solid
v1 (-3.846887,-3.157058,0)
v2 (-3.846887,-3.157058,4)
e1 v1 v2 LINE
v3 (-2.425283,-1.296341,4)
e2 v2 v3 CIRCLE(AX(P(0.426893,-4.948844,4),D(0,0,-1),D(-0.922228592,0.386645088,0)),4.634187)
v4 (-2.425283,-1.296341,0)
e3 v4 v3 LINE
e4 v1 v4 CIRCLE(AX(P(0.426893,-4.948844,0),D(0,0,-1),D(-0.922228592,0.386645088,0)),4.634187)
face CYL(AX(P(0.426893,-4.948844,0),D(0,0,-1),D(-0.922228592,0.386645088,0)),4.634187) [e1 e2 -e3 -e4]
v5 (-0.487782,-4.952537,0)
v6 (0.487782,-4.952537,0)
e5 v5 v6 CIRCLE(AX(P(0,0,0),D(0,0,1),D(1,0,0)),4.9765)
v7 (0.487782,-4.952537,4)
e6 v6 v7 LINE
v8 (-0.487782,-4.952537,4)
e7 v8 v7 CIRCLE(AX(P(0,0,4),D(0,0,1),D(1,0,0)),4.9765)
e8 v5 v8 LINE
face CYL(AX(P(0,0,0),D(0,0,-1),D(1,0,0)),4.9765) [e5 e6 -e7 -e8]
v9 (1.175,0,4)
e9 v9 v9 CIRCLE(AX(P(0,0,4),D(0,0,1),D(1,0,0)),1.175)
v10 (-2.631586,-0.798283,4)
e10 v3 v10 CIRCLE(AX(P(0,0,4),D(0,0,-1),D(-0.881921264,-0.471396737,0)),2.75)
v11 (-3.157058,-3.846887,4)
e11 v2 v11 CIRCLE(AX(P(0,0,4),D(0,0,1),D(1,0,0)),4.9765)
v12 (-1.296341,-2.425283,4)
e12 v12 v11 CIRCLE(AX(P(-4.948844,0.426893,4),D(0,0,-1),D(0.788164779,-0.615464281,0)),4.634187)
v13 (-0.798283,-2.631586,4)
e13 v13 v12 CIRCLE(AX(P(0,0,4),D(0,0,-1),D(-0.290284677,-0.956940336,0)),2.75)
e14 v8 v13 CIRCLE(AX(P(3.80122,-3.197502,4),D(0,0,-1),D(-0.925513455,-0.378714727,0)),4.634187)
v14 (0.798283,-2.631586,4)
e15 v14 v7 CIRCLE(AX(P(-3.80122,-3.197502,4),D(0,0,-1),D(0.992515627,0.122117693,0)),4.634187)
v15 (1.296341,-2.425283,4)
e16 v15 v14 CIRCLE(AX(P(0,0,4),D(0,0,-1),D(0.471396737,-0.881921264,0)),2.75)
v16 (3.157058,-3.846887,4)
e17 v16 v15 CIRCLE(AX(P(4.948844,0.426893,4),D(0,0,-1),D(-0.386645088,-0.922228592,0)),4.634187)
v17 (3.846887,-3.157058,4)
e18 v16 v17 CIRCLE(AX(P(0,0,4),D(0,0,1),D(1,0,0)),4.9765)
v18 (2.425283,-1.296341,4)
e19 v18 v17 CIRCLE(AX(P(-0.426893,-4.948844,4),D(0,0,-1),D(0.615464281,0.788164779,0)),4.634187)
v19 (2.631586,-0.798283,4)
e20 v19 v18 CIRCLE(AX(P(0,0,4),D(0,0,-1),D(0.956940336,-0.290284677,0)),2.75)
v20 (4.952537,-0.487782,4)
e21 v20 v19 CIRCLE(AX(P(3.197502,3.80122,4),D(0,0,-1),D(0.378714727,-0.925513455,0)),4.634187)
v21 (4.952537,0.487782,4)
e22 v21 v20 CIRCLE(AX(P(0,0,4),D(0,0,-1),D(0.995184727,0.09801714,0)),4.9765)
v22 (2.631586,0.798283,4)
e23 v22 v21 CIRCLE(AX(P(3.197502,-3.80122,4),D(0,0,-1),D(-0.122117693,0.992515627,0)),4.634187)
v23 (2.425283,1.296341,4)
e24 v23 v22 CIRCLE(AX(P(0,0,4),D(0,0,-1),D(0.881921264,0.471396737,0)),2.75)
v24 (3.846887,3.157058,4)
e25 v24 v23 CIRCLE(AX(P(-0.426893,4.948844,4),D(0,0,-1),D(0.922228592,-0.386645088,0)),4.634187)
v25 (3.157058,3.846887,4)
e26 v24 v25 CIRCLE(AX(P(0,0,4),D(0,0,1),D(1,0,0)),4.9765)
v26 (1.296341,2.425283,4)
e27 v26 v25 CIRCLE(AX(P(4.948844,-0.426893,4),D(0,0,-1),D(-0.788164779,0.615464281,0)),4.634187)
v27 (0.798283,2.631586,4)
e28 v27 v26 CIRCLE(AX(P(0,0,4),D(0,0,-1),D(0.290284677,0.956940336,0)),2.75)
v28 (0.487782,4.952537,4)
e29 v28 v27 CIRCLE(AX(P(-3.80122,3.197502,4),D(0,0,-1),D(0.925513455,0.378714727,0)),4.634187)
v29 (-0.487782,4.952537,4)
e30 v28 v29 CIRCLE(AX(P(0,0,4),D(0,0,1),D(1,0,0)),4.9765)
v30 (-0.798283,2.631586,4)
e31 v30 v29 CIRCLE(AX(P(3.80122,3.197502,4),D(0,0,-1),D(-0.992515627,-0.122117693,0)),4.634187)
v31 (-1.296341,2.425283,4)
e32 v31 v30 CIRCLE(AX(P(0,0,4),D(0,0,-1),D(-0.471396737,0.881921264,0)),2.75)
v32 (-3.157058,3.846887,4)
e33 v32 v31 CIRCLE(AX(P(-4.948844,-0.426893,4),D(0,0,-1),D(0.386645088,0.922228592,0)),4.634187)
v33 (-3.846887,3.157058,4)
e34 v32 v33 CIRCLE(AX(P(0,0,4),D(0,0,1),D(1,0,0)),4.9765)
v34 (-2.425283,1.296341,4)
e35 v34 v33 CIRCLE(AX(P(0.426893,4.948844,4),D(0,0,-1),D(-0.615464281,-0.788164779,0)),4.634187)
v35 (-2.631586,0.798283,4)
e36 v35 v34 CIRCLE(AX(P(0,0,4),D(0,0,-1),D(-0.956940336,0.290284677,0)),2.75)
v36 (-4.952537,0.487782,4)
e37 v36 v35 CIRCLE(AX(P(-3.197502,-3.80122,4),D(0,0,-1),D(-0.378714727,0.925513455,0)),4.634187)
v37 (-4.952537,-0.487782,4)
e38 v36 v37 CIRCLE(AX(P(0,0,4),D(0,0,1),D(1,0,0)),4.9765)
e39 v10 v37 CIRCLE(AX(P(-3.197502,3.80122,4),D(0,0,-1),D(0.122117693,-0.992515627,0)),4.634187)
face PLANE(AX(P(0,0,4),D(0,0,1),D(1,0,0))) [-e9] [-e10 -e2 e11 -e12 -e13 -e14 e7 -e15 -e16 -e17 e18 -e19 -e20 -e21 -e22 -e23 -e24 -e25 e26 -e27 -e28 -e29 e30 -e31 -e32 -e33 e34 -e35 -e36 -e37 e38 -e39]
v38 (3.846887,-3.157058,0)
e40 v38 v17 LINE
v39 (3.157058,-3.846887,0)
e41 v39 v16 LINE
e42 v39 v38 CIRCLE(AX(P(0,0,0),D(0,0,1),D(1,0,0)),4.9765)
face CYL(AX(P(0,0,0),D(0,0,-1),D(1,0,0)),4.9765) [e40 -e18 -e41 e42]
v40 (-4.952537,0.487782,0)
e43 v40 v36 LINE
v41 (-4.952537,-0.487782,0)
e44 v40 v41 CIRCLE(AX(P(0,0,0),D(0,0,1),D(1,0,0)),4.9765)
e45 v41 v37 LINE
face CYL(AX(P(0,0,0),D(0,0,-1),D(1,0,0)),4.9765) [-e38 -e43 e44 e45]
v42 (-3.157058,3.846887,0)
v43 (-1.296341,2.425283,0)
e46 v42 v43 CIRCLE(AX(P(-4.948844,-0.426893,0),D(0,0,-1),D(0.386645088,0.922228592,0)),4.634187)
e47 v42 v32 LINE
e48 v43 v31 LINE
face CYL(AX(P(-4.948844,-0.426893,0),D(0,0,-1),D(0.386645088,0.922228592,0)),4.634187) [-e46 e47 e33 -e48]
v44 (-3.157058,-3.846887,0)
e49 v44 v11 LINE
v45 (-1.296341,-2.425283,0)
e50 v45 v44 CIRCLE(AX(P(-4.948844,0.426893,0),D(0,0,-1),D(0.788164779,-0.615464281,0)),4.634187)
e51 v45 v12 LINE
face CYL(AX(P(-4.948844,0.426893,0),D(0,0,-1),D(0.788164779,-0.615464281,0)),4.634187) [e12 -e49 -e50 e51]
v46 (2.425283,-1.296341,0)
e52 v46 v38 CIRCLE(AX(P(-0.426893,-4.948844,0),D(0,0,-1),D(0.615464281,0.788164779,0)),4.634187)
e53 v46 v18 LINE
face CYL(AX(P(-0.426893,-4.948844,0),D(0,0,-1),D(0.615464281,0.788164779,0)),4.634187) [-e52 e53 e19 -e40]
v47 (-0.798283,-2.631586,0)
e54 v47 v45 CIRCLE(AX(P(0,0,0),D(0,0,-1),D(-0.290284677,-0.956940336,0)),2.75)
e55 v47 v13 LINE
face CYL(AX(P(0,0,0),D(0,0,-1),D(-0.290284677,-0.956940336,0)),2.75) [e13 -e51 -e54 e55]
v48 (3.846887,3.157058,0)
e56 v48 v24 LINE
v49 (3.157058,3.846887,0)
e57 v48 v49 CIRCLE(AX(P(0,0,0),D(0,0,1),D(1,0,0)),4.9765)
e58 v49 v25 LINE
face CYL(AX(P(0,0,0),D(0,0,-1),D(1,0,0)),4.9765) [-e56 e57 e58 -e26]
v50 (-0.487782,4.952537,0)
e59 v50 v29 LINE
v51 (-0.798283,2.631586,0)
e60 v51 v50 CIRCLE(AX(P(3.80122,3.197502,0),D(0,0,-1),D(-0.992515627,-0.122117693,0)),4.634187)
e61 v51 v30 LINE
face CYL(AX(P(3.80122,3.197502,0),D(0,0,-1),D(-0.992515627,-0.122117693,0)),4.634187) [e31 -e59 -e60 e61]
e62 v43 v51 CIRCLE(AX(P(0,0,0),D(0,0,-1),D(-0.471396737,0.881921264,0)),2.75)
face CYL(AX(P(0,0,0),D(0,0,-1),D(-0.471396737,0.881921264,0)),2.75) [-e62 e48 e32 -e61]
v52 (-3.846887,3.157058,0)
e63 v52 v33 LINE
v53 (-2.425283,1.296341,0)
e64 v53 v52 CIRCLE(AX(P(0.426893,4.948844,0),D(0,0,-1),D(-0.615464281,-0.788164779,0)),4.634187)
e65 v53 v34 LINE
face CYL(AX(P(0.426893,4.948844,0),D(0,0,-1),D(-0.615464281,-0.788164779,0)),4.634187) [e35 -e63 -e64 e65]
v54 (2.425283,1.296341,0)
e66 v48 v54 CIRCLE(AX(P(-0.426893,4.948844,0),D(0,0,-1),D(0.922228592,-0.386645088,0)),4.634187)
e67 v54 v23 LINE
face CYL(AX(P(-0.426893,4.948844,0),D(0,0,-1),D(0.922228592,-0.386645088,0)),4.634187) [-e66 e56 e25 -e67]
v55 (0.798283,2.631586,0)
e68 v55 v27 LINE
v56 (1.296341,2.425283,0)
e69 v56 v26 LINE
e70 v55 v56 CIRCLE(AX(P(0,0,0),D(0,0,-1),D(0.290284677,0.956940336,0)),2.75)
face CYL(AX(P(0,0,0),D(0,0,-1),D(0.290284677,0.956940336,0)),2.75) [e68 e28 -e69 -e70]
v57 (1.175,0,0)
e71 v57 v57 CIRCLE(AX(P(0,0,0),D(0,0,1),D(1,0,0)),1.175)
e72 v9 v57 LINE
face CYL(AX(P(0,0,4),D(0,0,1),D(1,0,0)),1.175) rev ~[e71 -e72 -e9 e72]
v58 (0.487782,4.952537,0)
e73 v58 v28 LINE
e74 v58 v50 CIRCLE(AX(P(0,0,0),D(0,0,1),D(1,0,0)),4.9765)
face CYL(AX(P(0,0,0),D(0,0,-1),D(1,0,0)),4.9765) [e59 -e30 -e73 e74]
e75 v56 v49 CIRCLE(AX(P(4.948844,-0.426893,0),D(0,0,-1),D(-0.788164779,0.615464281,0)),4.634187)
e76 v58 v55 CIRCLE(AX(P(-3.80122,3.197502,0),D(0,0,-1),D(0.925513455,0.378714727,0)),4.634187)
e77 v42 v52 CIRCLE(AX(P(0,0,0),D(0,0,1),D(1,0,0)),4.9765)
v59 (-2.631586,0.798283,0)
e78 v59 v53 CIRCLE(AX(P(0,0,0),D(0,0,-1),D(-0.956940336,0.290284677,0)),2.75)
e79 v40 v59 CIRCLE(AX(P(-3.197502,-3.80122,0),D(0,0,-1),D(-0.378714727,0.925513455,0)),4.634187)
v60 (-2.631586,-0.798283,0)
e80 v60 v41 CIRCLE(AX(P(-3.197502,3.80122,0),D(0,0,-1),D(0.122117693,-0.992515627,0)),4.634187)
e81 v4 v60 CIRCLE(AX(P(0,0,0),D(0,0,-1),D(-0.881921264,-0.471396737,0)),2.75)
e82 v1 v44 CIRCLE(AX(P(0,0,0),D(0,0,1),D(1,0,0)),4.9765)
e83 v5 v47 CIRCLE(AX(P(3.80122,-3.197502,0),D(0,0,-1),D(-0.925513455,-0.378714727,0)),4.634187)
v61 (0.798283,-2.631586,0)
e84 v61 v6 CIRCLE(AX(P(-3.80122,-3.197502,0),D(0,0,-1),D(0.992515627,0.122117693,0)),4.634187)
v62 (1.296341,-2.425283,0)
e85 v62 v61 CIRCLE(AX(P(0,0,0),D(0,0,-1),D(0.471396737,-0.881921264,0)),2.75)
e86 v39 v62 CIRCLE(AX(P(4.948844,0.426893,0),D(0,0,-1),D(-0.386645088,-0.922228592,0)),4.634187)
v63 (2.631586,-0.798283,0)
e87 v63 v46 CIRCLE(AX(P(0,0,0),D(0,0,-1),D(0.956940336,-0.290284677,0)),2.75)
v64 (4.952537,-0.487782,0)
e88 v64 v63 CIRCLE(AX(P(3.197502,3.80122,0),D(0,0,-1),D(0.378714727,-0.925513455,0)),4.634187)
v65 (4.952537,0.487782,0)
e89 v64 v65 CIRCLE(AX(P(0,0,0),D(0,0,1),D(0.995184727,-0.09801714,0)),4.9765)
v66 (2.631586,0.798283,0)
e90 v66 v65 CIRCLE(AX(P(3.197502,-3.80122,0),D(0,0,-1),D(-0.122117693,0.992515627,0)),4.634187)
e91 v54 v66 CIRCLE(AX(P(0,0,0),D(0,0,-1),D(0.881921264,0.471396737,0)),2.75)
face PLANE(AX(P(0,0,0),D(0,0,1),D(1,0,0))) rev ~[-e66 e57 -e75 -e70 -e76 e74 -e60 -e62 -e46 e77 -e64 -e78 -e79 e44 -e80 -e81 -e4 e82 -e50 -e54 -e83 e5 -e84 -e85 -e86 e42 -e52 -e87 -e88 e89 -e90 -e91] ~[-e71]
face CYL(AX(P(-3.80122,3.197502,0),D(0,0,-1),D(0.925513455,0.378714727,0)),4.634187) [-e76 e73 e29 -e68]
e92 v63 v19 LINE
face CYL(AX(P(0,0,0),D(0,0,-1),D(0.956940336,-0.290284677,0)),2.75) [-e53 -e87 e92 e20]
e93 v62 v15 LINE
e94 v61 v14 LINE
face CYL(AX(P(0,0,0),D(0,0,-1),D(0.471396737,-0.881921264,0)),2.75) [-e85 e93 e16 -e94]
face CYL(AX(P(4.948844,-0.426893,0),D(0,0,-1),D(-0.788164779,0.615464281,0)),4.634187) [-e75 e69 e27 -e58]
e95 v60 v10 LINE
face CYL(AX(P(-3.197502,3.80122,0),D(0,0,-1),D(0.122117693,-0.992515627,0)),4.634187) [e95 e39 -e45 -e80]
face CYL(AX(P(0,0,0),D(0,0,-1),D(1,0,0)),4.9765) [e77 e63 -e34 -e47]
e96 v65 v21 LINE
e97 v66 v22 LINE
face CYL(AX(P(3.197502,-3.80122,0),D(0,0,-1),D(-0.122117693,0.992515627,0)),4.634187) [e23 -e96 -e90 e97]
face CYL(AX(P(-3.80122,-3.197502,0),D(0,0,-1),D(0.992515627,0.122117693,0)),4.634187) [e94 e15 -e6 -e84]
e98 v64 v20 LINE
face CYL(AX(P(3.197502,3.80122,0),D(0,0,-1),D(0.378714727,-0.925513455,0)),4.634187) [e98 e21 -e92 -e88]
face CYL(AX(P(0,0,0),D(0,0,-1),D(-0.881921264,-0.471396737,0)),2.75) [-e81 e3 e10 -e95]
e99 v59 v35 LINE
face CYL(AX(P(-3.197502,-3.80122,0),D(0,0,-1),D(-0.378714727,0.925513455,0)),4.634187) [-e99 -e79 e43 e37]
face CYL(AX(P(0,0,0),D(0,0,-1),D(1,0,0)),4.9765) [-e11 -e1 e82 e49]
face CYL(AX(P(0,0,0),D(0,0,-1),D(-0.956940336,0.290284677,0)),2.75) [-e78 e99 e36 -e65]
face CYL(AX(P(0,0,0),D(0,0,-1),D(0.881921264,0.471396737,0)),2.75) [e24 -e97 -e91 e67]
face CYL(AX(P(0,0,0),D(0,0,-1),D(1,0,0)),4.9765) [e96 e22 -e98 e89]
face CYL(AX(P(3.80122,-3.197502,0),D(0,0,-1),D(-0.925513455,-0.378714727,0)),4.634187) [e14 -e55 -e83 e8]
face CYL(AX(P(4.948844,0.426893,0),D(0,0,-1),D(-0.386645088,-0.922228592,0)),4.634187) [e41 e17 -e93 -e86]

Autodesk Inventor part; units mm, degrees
sketch "Sketch1" plane through (0, 0, 0) normal (0, 0, 1) x (1, 0, 0)
  circle A0 centre (0, 0) radius 4.9765
  dimension "d0" = 9.953
extrude "Extrusion1" add sketch "Sketch1" along normal blind 4
ref_plane "Work Plane2" through (0, 0, 2) normal (0, 0, 1) x (1, 0, 0)
sketch "Sketch2" plane through (0, 0, 0) normal (0, 0, -1) x (-1, 0, 0)
  circle A0 centre (0, 0) radius 4.9765 projected
  circle A1 centre (0, 0) radius 4
  dimension "d3" = 8
surface extrude "節圓直徑" sketch "Sketch2" against normal through all shown no curves A1
ref_plane "Work Plane8" through (0, 0, 0) normal (0.9238795, 0.3826834, 0) x (0, 0, 1)
ref_plane "Work Plane9" through (0, 0, 0) normal (1, 0, 0) x (0, 1, 0)
spur gear teeth "正齒輪" teeth 8 pitch diameter 8 tip diameter 9.953 root diameter 5.5 face width 4 start plane through (0, 0, 0) normal (0, 0, -1) x (-1, 0, 0)
sketch "草圖3" plane through (0, 0, 4) normal (0, 0, 1) x (1, 0, 0)
  circle A0 centre (0, 0) radius 1.175
  dimension "d49" = 2.35
extrude "擠出2" cut sketch "草圖3" against normal up to next
equation "\"d0\" = da_da"
equation "\"d1\" = da_b"
equation "\"d3\" = da_d"
equation "\"d16\" = da_aw"
equation "\"d43\" = da_aw"
equation "\"d46\" = da_aw"
equation "\"da_da\" = 9.95296"
equation "\"da_b\" = 4"
equation "\"da_d\" = 8"
equation "\"da_aw\" = 23.624533"
properties part number "正齒輪1" material "Steel"
